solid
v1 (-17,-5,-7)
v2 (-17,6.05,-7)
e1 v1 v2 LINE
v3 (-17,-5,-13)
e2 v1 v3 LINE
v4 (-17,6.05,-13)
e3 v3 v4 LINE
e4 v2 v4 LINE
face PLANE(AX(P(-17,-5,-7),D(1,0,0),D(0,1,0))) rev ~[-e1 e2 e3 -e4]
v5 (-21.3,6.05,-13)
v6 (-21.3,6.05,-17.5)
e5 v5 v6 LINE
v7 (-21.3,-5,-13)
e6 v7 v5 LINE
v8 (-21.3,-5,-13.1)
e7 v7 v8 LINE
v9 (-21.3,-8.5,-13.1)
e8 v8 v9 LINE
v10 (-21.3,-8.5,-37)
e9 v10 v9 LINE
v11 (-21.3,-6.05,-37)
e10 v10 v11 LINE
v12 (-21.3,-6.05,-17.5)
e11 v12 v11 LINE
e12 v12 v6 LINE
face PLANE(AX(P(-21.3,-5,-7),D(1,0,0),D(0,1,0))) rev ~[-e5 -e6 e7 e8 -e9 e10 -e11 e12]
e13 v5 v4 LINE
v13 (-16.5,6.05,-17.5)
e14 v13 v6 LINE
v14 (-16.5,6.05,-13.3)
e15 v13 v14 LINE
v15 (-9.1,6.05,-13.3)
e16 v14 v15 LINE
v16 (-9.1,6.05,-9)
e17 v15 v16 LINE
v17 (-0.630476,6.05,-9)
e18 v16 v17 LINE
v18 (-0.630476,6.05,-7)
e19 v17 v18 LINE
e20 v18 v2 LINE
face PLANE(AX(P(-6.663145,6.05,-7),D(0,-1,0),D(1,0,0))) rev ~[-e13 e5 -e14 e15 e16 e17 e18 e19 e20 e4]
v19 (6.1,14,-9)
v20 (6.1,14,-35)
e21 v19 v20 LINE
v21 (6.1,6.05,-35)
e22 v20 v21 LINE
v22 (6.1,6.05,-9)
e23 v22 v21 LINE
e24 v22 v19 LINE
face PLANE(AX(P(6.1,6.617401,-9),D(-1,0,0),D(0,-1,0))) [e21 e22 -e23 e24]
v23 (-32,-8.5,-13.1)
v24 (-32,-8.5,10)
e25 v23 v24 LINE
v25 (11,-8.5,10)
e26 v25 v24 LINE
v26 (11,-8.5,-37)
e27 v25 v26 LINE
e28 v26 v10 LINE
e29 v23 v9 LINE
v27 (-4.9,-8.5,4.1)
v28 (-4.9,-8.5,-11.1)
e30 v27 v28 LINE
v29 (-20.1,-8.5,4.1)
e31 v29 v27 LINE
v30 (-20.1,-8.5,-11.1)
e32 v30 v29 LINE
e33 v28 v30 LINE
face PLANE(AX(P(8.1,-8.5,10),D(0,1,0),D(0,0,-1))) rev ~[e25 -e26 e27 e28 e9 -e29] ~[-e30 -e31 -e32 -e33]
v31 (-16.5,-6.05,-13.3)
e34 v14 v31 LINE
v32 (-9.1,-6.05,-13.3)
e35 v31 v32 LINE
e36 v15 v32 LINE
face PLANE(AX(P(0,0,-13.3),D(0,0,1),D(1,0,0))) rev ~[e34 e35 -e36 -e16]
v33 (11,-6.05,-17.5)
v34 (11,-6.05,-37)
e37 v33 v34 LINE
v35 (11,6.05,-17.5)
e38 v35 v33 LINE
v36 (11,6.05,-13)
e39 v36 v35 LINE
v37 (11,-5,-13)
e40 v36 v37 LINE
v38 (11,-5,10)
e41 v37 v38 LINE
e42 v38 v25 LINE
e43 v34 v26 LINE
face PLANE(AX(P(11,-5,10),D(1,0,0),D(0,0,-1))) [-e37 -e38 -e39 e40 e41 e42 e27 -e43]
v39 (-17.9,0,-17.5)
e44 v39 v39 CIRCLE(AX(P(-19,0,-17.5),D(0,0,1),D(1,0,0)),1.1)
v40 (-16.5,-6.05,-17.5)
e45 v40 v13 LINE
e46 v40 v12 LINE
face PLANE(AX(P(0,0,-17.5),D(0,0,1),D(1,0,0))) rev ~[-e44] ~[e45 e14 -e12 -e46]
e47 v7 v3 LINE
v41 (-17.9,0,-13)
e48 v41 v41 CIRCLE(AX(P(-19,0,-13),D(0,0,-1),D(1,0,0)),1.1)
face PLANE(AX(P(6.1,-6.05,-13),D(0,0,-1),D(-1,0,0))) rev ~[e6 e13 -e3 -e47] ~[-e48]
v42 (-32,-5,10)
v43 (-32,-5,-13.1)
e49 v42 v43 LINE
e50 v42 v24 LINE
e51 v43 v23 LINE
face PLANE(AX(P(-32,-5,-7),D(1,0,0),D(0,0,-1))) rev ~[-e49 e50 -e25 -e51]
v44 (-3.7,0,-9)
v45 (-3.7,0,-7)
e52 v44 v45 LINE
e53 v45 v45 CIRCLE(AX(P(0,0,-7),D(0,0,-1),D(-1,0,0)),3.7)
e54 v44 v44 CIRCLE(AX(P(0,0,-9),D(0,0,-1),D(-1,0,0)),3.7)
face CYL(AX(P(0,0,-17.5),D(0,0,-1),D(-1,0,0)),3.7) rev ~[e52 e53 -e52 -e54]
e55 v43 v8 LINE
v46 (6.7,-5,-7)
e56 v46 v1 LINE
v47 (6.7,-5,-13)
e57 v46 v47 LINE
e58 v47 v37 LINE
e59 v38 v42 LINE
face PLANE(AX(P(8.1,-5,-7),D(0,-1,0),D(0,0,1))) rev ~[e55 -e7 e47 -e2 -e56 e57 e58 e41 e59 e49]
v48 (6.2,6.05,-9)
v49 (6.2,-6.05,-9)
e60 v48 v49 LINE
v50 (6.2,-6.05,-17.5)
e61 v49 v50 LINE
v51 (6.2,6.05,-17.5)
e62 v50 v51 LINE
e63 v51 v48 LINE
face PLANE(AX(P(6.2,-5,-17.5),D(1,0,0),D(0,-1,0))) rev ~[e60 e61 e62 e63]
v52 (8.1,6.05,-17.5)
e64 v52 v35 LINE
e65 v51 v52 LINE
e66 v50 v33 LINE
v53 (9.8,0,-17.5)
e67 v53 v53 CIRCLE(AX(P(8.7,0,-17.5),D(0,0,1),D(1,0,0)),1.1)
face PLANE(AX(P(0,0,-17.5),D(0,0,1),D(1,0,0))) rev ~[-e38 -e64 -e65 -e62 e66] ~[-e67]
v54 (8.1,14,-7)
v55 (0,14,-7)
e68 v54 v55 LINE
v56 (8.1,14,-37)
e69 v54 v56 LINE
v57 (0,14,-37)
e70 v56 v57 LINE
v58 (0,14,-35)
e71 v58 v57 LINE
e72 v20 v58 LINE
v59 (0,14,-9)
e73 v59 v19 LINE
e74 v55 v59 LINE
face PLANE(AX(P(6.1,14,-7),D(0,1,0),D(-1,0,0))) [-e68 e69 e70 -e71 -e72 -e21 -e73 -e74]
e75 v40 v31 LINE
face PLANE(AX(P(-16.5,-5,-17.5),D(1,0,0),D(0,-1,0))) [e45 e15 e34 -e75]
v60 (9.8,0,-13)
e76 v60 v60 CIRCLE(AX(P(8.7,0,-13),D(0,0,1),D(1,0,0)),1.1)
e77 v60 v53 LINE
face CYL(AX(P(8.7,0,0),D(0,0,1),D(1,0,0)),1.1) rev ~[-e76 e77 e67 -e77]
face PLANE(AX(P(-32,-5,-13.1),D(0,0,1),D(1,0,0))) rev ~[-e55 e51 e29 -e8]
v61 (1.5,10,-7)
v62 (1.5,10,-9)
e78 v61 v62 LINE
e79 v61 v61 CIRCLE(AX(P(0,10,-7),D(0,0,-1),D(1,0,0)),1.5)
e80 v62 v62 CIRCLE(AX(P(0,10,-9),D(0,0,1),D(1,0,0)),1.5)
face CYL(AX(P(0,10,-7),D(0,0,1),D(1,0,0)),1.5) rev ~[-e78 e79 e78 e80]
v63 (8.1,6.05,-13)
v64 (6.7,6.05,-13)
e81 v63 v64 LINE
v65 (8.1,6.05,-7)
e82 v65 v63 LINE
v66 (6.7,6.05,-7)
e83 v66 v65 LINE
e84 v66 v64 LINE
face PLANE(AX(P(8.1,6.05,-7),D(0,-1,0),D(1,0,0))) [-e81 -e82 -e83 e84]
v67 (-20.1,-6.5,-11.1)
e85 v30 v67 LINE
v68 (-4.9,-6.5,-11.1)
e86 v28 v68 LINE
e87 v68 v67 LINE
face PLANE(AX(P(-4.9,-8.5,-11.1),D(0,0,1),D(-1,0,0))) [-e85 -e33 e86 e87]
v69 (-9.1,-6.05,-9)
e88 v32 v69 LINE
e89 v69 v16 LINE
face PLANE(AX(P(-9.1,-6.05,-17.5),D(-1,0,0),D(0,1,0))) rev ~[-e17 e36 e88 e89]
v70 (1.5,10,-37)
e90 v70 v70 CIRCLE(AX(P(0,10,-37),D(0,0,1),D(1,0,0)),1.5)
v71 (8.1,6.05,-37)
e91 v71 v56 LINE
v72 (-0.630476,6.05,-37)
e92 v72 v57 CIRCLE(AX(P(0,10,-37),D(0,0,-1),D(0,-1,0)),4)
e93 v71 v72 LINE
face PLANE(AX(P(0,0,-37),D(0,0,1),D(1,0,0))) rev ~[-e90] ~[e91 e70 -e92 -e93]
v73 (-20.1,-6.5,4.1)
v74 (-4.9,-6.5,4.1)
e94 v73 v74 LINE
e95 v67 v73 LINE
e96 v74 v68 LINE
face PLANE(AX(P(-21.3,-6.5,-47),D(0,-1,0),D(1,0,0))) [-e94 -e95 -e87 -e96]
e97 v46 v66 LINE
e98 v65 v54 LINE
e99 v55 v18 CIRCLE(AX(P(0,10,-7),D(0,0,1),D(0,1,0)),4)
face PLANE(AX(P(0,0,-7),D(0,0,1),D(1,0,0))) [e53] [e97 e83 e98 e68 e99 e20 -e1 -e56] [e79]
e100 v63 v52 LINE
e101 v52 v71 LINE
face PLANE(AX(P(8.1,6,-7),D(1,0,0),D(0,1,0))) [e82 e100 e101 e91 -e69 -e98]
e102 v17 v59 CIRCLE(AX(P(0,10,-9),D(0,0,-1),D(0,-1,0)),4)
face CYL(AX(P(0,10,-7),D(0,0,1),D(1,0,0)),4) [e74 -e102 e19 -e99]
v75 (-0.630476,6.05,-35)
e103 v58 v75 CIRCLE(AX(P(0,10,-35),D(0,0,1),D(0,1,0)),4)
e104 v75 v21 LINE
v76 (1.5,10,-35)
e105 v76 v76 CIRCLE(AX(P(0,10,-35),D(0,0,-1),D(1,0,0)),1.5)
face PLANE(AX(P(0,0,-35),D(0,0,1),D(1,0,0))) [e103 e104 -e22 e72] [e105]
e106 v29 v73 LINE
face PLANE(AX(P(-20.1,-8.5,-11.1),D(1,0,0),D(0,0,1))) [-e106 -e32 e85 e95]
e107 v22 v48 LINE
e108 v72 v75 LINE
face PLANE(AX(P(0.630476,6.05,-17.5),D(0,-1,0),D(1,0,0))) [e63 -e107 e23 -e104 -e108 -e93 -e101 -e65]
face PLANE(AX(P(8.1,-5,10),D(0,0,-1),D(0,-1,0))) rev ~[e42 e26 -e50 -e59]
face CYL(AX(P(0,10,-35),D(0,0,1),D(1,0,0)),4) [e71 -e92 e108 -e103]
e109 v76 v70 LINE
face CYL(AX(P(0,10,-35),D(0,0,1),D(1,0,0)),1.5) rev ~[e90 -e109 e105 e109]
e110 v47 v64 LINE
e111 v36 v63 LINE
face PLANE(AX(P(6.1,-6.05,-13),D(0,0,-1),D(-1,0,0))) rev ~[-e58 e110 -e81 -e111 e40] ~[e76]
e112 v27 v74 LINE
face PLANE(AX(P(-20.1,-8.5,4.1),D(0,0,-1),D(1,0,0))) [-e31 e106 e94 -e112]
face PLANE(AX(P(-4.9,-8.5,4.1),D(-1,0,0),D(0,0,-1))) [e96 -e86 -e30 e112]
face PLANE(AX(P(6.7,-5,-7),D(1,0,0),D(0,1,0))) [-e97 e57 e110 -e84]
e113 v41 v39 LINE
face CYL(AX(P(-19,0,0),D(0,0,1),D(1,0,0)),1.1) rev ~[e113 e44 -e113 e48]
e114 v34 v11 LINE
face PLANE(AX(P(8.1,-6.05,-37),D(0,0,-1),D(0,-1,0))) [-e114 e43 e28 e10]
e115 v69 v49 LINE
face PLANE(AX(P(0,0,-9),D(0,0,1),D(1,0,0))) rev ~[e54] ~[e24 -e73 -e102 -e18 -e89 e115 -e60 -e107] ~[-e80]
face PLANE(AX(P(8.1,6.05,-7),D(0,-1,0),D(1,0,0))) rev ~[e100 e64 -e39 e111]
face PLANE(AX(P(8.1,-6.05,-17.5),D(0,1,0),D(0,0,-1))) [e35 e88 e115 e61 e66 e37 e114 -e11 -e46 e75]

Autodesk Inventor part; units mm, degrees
sketch "スケッチ1" plane through (0, 0, 0) normal (0, 0, 1) x (1, 0, 0)
  circle A0 centre (0, 0) radius 1.5
  circle A1 centre (0, 0) radius 4
  line L0 (6.1, 4) -> (6.1, -4)
  line L1 (-27.76, 0) -> (17.46, 0) construction
  line L2 (6.1, 4) -> (0, 4)
  line L3 (6.1, -4) -> (0, -4)
  line L4 (6.1, -4) -> (8.1, -4)
  line L5 (8.1, -4) -> (8.1, 4)
  line L6 (8.1, 4) -> (6.1, 4)
  line L7 (0, -13.6) -> (0, 18.6) construction
  circle A2 centre (0, 10) radius 1.5
  circle A3 centre (0, 10) radius 4
  line L8 (6.1, 14) -> (6.1, 6)
  line L9 (6.1, 14) -> (0, 14)
  line L10 (6.1, 6) -> (0, 6)
  line L11 (6.1, 6) -> (8.1, 6)
  line L12 (8.1, 6) -> (8.1, 14)
  line L13 (8.1, 14) -> (6.1, 14)
  line L14 (-16.4, 6.05) -> (6.1, 6.05) construction
  line L15 (6.1, 6.05) -> (6.1, -6.05)
  line L16 (6.1, -6.05) -> (-16.4, -6.05) construction
  line L17 (-16.4, -6.05) -> (-16.4, 6.05)
  line L18 (-16.4, 6.05) -> (6.1, -6.05) construction
  line L19 (6.1, 6.05) -> (-16.4, -6.05) construction
  line L20 (-21.3, 6.05) -> (11, 6.05) construction
  line L21 (11, 6.05) -> (11, -6.05) construction
  line L22 (11, -6.05) -> (-21.3, -6.05)
  line L23 (-21.3, -6.05) -> (-21.3, 6.05) construction
  line L24 (-21.3, 6.05) -> (11, -6.05) construction
  line L25 (11, 6.05) -> (-21.3, -6.05) construction
  line L26 (-21.3, 0) -> (11, 0) construction
  circle A4 centre (-19, 0) radius 1.1
  line L27 (-5.15, 6.05) -> (-5.15, -6.05) construction
  circle A5 centre (0, 0) radius 2.425
  circle A6 centre (0, 0) radius 6.05
  circle A7 centre (0, 0) radius 9
  line L28 (8.1, -7) -> (-21.3, -7)
  line L29 (-21.3, -7) -> (-21.3, 6.05)
  line L30 (-21.3, 6.05) -> (8.1, 6.05)
  line L31 (8.1, 6.05) -> (8.1, -7)
  line L32 (-21.3, -5) -> (-20.943492, -5)
  line L33 (-20.943492, -5) -> (8.1, -5)
  circle A8 centre (8.7, 0) radius 1.1
  line L34 (8.1, 6.05) -> (11, 6.05)
  line L35 (11, 6.05) -> (11, -6.05)
  point P0 (6.1, 0)
  point P1 (6.1, 10)
  point P2 (-5.15, 0)
  point P3 (-5.15, 0)
  point P4 (-0.630476, 6.05)
  point P5 (8.1, 6.05)
  point P6 (8.1, -6.05)
  point P7 (0, 6.05)
  point P8 (-6.663145, 6.05)
  point P9 (-6.663145, -6.05)
  point P10 (0, -6.05)
  point P11 (6.1, 6.617401)
  point P12 (6.663145, 6.05)
  point P13 (0.630476, 6.05)
  point P14 (0.489992, 6.030125)
  point P15 (0.776209, 6)
  point P16 (8.062258, 4)
  point P17 (8.1, 3.923009)
  point P18 (8.062258, -4)
  point P19 (8.1, -3.923009)
  point P20 (6.708204, 6)
  dimension "d0" = 3
  dimension "d1" = 8
  dimension "d3" = 8
  dimension "d4" = 2
  dimension "d11" = 10
  dimension "d21" = 12.1
  dimension "d22" = 22.5
  dimension "d23" = 32.3
  dimension "d24" = 2.2
  dimension "d26" = 27.7
  dimension "d28" = 18
  dimension "d29" = 12.1
  dimension "d30" = 4.85
  dimension "d31" = 6.1
  dimension "d32" = 7
  dimension "d55" = 2
extrude "押し出し1" add sketch "スケッチ1" along normal blind 2 contours A1 | A1 L2 A6 L3 | L2 L0 L3 A6 | L6 A7 L5 A8 L4 L0 | L6 L5 A7 | A7 L5 L4 | L5 A8 | A5
extrude "押し出し2" add sketch "スケッチ1" against normal blind 7 contours L6 A7 L5 A8 L4 L0 | L6 L5 A7 | A7 L5 L4 | L5 A8
extrude "押し出し3" add sketch "スケッチ1" against normal blind 2 from surface at -7 contours A6 A3 L30 L8 L10 | L10 A3 A6 | L8 L30 A7 L11 | A3 A6 | A6 L30 A3 | A7 L30 L12 L11 | L30 A3 A7 L8 | L8 A7 L30 | A3 L30 A6 | L30 A3 A7 A2 | A7 L8 L13 L12 L30 | A7 A3 L9 L8 | A7 A2 A3
pattern_linear "矩形状パターン1" count 2 spacing 28 along (0, 0, -1) of "押し出し3"
ref_plane "作業平面1" through (0, 0, -17.5) normal (0, 0, 1) x (1, 0, 0)
extrude "押し出し4" add sketch "スケッチ1" against normal up to surface (10.5 mm away) from surface at -7 contours A0 | A1 | A1 L2 A6 L3 | A1 L3 A6 L33 A3 L10 L2 | A6 L10 L15 L2 | L2 L0 L3 A6 | L3 L15 L33 A6 | L6 A7 L5 A8 L4 L0 | L15 L11 A7 L6 | A6 A3 L30 L8 L10 | L10 A3 A6 | L4 A7 L33 L15 | L33 L15 L22 A6 | A6 L33 | A7 L11 L31 L6 | L6 L5 A7 | L8 L30 A7 L11 | A3 A6 | A6 L30 A3 | A7 L5 L4 | L4 L31 L33 A7 | L33 A7 L22 L15 | L22 A7 L28 | L22 A7 L33 A6 | L33 A7 L30 A3 A6 | A7 L30 L12 L11 | A3 L30 A6 | L33 L31 L22 A7 | A7 L28 L29 L22 | L22 L17 L33 A7 | L33 L17 L30 A7 | L5 A8 | L22 L31 L28 A7 | L22 L29 L32 L33 L17 | L33 L32 L29 L30 L17 | A4 | A5
ref_plane "作業平面2" through (0, 0, -13.3) normal (0, 0, 1) x (1, 0, 0)
extrude "押し出し6" cut sketch "スケッチ1" against normal blind 23.4 from surface at -13.3 contours A0 | A1 | A1 L2 A6 L3 | A1 L3 A6 L33 A3 L10 L2 | A6 L10 L15 L2 | L2 L0 L3 A6 | L3 L15 L33 A6 | A6 A3 L30 L8 L10 | L10 A3 A6 | L33 L15 L22 A6 | A6 L33 | A3 A6 | A6 L30 A3 | L22 A7 L33 A6 | L33 A7 L30 A3 A6 | A3 L30 A6 | L22 L17 L33 A7 | L33 L17 L30 A7 | A5
ref_plane "作業平面3" through (0, 0, -9) normal (0, 0, 1) x (1, 0, 0)
extrude "押し出し7" cut sketch "スケッチ1" against normal up to surface (4.3 mm away) from surface at -9 contours A0 | A1 | A1 L2 A6 L3 | A1 L3 A6 L33 A3 L10 L2 | L10 A3 A6 | A6 L33 | A3 A6 | L22 A7 L33 A6 | L33 A7 L30 A3 A6 | A3 L30 A6 | A5 picked at (-0.459231, 6.046871)
extrude "押し出し8" cut sketch "スケッチ1" against normal up to surface (9 mm away) contours A0 | A5
extrude "押し出し9" cut sketch "スケッチ1" against normal through all contours A4
extrude "押し出し10" add sketch "スケッチ1" against normal up to surface (28 mm away) from surface at -9 contours L22 A7 L28 | L8 A7 L30 | A7 L28 L29 L22 | A7 L8 L13 L12 L30 | L22 L31 L28 A7
extrude "押し出し11" cut sketch "スケッチ1" against normal up to surface (19.5 mm away) from surface at -17.5 contours A6 A3 L30 L8 L10 | L10 A3 A6 | L8 L30 A7 L11 | A3 A6 | A6 L30 A3 | A7 L30 L12 L11 | A3 L30 A6
sketch "スケッチ3" plane through (0, 4, 2) normal (0, 1, 0) x (1, 0, 0)
  line L0 (8.1, 0) -> (0, 0) projected
  line L1 (8.1, 9) -> (8.1, 0) projected
  line L2 (6.1, 9) -> (8.1, 9) projected
  line L3 (6.1, 2) -> (6.1, 9) projected
  line L4 (6.1, 2) -> (0, 2) projected
  line L5 (0, 2) -> (0, 0) projected
  line L6 (0, 2) -> (0, 2) projected
  line L7 (0, 2) -> (0, 0) projected
  line L8 (0, 0) -> (0, 0) projected
  line L9 (0, 2) -> (0, 0) projected
  line L10 (-4, 2) -> (-4, 0) projected
  line L11 (-4, 2) -> (0, 2) projected
  line L12 (-4, 0) -> (0, 0) projected
extrude "押し出し12" cut sketch "スケッチ3" against normal through all
extrude "押し出し13" add sketch "スケッチ1" along normal blind 10 and the other way blind 7 contours L33 L15 L22 A6 | A6 L33 | L33 A7 L22 L15 | L22 A7 L28 | L22 A7 L33 A6 | L33 L31 L22 A7 | A7 L28 L29 L22 | L22 L17 L33 A7 | L22 L31 L28 A7 | L22 L29 L32 L33 L17
sketch "スケッチ4" plane through (-21.3, 6.05, -17.5) normal (-1, 0, 0) x (0, 0, 1)
  line L0 (27.5, -13.05) -> (-19.5, -13.05) projected
  line L1 (27.5, -11.05) -> (27.5, -13.05) projected
  line L2 (10.5, -11.05) -> (27.5, -11.05) projected
  line L3 (10.5, 0) -> (10.5, -11.05) projected
  line L4 (10.5, 0) -> (0, 0) projected
  line L5 (0, -12.1) -> (0, 0) projected
  line L6 (0, -12.1) -> (-19.5, -12.1) projected
  line L7 (-19.5, -12.1) -> (-19.5, -13.05) projected
  line L8 (10.5, -11.05) -> (10.5, -13.05)
  point P0 (17.5, -6.05)
extrude "押し出し14" add sketch "スケッチ4" along normal blind 10.7 contours L0 L8 L2 L1
sketch "スケッチ5" plane through (-21.3, -5, -47) normal (0, -1, 0) x (1, 0, 0)
  line L0 (29.4, 10) -> (29.4, 57) projected
  line L1 (29.4, 57) -> (-10.7, 57) projected
  line L2 (-10.7, 40) -> (-10.7, 57) projected
  line L3 (0, 40) -> (-10.7, 40) projected
  line L4 (0, 40) -> (0, 10) projected
  line L5 (0, 10) -> (29.4, 10) projected
  line L6 (-10.7, 43.5) -> (29.4, 43.5) construction
  line L7 (1.2, 51.1) -> (16.4, 51.1)
  line L8 (16.4, 51.1) -> (16.4, 35.9)
  line L9 (16.4, 35.9) -> (1.2, 35.9)
  line L10 (1.2, 35.9) -> (1.2, 51.1)
  line L11 (1.2, 51.1) -> (16.4, 35.9) construction
  line L12 (16.4, 51.1) -> (1.2, 35.9) construction
  line L13 (-10.7, 57) -> (-10.7, 40) projected
  line L14 (-10.7, 40) -> (-10.7, 33.9)
  line L15 (-10.7, 33.9) -> (0, 33.9)
  line L16 (29.4, 57) -> (-10.7, 57) projected
  point P0 (21.3, 47)
  point P1 (8.8, 43.5)
  dimension "d63" = 15.2
  dimension "d64" = 15.2
  dimension "d68" = 13.5
  dimension "d69" = 2
  dimension "d105" = 19.5
extrude "押し出し17" add sketch "スケッチ5" along normal blind 1.5 from surface at 2 contours L5 L4 L3 L2 L1 L0 | L7 L8 L9 L10
extrude "押し出し15" cut sketch "スケッチ5" against normal blind 2 from surface at 3.5 contours L7 L8 L9 L10
ref_plane "作業平面4" through (-12.5, -8.5, -11.1) normal (-1, 0, 0) x (0, 0, 1)
ref_plane "作業平面5" through (-20.1, -6.5, -3.5) normal (0, 0, 1) x (1, 0, 0)
extrude "押し出し16" add sketch "スケッチ5" along normal up to surface (3.5 mm away) contours L15 L14 L3 L4
extrude "押し出し18" add sketch "スケッチ1" against normal up to surface (10.5 mm away) from surface at -7 contours L6 A7 L5 A8 L4 L0 | L15 L11 A7 L6 | L4 A7 L33 L15 | A7 L11 L31 L6 | L4 L31 L33 A7 | L33 A7 L22 L15 | L31 L12 L34 L35 L22 L5 A7 A8 | A7 A8 L5 | A7 L30 L12 L11 | L33 L31 L22 A7 | L5 A8 A7 | A8 A7 L5 | L5 A8 | A8 A7
extrude "押し出し19" cut sketch "スケッチ1" against normal through all contours A8 A7 L5 | L5 A8 | A8 A7 picked at (8.4, 0)
sketch "スケッチ6" plane through (8.1, -5, 10) normal (1, 0, 0) x (0, 0, -1)
  line L0 (27.5, -1.05) -> (17, -1.05) projected
  line L1 (17, -1.05) -> (17, 0) projected
  line L2 (17, 0) -> (0, 0) projected
  line L3 (0, 0) -> (0, -3.5) projected
  line L4 (0, -3.5) -> (47, -3.5) projected
  line L5 (47, -1.05) -> (47, -3.5) projected
  line L6 (27.5, -1.05) -> (47, -1.05) projected
  point P0 (10, 5)
extrude "押し出し20" add sketch "スケッチ6" along normal up to surface (2.9 mm away)
sketch "スケッチ7" plane through (6.1, -6.05, -17.5) normal (0, 0, -1) x (-1, 0, 0)
  circle A0 centre (-2.6, 6.05) radius 1.1
  line L0 (-4.9, 0) -> (0, 0)
  line L1 (0, 0) -> (0, 12.1)
  line L2 (0, 12.1) -> (-2, 12.1)
  line L3 (-2, 12.1) -> (-4.9, 12.1)
  line L4 (-4.9, 12.1) -> (-4.9, 0)
  line L5 (0, 12.1) -> (0, 0)
  line L6 (0, 0) -> (6.1, 0)
  arc A1 (6.1, 12.1) -> (6.1, 0) centre (6.1, 6.05) ccw
  line L7 (0, 12.1) -> (6.1, 12.1)
  arc A2 (12.763145, 0) -> (12.763145, 12.1) centre (6.1, 6.05) ccw
  line L8 (12.763145, 0) -> (22.5, 0)
  line L9 (22.5, 0) -> (22.5, 12.1)
  line L10 (12.763145, 12.1) -> (22.5, 12.1)
  line L11 (22.5, 12.1) -> (22.5, 0)
  line L12 (22.5, 0) -> (27.4, 0)
  line L13 (27.4, 0) -> (27.4, 12.1)
  line L14 (27.4, 12.1) -> (22.5, 12.1)
  circle A3 centre (25.1, 6.05) radius 1.1
  line L15 (6.730476, 12.1) -> (12.763145, 12.1)
  line L16 (6.1, 0) -> (12.763145, 0)
  circle A4 centre (6.1, 6.05) radius 2.425
  line L17 (0, 12.1) -> (6.1, 12.1)
  line L18 (6.1, 12.1) -> (6.730476, 12.1)
  line L19 (-0.1, 12.1) -> (-0.1, 0)
  line L20 (-4.9, 0) -> (0, 0)
  line L21 (22.6, 12.1) -> (22.6, 0)
  line L22 (22.5, 0) -> (27.4, 0)
  arc A5 (6.1, 12.2) -> (6.1, -0.1) centre (6.1, 6.05) ccw
  arc A6 (12.83718, -0.067222) -> (12.83718, 12.167222) centre (6.1, 6.05) ccw
  circle A7 centre (6.1, 6.05) radius 3.7
  line L23 (15.2, 12.1) -> (15.2, 0)
  line L24 (27.4, 1.05) -> (-4.9, 1.05)
  line L25 (23.1, 1.05) -> (23.1, 12.1)
  line L26 (-0.6, 1.05) -> (-0.6, 12.1)
  line L27 (22.5, 12.1) -> (22.5, 0)
  line L28 (22.5, 0) -> (27.4, 0)
  line L29 (27.4, 0) -> (27.4, 12.1)
  line L30 (27.4, 12.1) -> (22.5, 12.1)
  point P0 (22.6, 0)
  point P1 (-0.1, 0)
  point P2 (12.89761, 0)
  point P3 (12.89761, 12.1)
  point P4 (4.995464, 12.1)
  point P5 (4.995464, 0)
  point P6 (15.2, 6.05)
  dimension "d80" = 0.1
  dimension "d81" = 0.1
  dimension "d84" = 0.1
  dimension "d85" = 0.1
  dimension "d99" = 2
  dimension "d101" = 2
  dimension "d104" = 7.4
extrude "押し出し21" cut sketch "スケッチ7" against normal up to surface (4.2 mm away) contours L19 L24 L1 L0 | L19 L2 L1 A5 L24 | A5 L1 | L9 L24 L21 L12 | L9 L14 L21 L24
sketch "スケッチ7 outline for 押し出し22" plane through (6.1, -6.05, -17.5) normal (0, 0, -1) x (-1, 0, 0)
  arc A0 (12.763145, 12.1) -> (12.763145, 0) centre (6.1, 6.05) cw
  line L0 (12.763145, 0) -> (15.2, 0)
  line L1 (15.2, 0) -> (15.2, 12.1)
  line L2 (15.2, 12.1) -> (12.763145, 12.1)
  arc A1 (6.1, 0) -> (6.1, 12.1) centre (6.1, 6.05) cw
  line L3 (6.1, 12.1) -> (-0.1, 12.1)
  line L4 (-0.1, 12.1) -> (-0.1, 0)
  line L5 (-0.1, 0) -> (6.1, 0)
extrude "押し出し22" cut sketch "スケッチ7 outline for 押し出し22" against normal up to surface (8.5 mm away)
extrude "押し出し23" cut sketch "スケッチ7" against normal through all contours A7
extrude "押し出し26" cut sketch "スケッチ7" along normal blind 6 from surface at -10.5 contours L4 L3 L2 L26 L24 | L25 L14 L13 L24
properties part number "housing_shaft_link_base"
